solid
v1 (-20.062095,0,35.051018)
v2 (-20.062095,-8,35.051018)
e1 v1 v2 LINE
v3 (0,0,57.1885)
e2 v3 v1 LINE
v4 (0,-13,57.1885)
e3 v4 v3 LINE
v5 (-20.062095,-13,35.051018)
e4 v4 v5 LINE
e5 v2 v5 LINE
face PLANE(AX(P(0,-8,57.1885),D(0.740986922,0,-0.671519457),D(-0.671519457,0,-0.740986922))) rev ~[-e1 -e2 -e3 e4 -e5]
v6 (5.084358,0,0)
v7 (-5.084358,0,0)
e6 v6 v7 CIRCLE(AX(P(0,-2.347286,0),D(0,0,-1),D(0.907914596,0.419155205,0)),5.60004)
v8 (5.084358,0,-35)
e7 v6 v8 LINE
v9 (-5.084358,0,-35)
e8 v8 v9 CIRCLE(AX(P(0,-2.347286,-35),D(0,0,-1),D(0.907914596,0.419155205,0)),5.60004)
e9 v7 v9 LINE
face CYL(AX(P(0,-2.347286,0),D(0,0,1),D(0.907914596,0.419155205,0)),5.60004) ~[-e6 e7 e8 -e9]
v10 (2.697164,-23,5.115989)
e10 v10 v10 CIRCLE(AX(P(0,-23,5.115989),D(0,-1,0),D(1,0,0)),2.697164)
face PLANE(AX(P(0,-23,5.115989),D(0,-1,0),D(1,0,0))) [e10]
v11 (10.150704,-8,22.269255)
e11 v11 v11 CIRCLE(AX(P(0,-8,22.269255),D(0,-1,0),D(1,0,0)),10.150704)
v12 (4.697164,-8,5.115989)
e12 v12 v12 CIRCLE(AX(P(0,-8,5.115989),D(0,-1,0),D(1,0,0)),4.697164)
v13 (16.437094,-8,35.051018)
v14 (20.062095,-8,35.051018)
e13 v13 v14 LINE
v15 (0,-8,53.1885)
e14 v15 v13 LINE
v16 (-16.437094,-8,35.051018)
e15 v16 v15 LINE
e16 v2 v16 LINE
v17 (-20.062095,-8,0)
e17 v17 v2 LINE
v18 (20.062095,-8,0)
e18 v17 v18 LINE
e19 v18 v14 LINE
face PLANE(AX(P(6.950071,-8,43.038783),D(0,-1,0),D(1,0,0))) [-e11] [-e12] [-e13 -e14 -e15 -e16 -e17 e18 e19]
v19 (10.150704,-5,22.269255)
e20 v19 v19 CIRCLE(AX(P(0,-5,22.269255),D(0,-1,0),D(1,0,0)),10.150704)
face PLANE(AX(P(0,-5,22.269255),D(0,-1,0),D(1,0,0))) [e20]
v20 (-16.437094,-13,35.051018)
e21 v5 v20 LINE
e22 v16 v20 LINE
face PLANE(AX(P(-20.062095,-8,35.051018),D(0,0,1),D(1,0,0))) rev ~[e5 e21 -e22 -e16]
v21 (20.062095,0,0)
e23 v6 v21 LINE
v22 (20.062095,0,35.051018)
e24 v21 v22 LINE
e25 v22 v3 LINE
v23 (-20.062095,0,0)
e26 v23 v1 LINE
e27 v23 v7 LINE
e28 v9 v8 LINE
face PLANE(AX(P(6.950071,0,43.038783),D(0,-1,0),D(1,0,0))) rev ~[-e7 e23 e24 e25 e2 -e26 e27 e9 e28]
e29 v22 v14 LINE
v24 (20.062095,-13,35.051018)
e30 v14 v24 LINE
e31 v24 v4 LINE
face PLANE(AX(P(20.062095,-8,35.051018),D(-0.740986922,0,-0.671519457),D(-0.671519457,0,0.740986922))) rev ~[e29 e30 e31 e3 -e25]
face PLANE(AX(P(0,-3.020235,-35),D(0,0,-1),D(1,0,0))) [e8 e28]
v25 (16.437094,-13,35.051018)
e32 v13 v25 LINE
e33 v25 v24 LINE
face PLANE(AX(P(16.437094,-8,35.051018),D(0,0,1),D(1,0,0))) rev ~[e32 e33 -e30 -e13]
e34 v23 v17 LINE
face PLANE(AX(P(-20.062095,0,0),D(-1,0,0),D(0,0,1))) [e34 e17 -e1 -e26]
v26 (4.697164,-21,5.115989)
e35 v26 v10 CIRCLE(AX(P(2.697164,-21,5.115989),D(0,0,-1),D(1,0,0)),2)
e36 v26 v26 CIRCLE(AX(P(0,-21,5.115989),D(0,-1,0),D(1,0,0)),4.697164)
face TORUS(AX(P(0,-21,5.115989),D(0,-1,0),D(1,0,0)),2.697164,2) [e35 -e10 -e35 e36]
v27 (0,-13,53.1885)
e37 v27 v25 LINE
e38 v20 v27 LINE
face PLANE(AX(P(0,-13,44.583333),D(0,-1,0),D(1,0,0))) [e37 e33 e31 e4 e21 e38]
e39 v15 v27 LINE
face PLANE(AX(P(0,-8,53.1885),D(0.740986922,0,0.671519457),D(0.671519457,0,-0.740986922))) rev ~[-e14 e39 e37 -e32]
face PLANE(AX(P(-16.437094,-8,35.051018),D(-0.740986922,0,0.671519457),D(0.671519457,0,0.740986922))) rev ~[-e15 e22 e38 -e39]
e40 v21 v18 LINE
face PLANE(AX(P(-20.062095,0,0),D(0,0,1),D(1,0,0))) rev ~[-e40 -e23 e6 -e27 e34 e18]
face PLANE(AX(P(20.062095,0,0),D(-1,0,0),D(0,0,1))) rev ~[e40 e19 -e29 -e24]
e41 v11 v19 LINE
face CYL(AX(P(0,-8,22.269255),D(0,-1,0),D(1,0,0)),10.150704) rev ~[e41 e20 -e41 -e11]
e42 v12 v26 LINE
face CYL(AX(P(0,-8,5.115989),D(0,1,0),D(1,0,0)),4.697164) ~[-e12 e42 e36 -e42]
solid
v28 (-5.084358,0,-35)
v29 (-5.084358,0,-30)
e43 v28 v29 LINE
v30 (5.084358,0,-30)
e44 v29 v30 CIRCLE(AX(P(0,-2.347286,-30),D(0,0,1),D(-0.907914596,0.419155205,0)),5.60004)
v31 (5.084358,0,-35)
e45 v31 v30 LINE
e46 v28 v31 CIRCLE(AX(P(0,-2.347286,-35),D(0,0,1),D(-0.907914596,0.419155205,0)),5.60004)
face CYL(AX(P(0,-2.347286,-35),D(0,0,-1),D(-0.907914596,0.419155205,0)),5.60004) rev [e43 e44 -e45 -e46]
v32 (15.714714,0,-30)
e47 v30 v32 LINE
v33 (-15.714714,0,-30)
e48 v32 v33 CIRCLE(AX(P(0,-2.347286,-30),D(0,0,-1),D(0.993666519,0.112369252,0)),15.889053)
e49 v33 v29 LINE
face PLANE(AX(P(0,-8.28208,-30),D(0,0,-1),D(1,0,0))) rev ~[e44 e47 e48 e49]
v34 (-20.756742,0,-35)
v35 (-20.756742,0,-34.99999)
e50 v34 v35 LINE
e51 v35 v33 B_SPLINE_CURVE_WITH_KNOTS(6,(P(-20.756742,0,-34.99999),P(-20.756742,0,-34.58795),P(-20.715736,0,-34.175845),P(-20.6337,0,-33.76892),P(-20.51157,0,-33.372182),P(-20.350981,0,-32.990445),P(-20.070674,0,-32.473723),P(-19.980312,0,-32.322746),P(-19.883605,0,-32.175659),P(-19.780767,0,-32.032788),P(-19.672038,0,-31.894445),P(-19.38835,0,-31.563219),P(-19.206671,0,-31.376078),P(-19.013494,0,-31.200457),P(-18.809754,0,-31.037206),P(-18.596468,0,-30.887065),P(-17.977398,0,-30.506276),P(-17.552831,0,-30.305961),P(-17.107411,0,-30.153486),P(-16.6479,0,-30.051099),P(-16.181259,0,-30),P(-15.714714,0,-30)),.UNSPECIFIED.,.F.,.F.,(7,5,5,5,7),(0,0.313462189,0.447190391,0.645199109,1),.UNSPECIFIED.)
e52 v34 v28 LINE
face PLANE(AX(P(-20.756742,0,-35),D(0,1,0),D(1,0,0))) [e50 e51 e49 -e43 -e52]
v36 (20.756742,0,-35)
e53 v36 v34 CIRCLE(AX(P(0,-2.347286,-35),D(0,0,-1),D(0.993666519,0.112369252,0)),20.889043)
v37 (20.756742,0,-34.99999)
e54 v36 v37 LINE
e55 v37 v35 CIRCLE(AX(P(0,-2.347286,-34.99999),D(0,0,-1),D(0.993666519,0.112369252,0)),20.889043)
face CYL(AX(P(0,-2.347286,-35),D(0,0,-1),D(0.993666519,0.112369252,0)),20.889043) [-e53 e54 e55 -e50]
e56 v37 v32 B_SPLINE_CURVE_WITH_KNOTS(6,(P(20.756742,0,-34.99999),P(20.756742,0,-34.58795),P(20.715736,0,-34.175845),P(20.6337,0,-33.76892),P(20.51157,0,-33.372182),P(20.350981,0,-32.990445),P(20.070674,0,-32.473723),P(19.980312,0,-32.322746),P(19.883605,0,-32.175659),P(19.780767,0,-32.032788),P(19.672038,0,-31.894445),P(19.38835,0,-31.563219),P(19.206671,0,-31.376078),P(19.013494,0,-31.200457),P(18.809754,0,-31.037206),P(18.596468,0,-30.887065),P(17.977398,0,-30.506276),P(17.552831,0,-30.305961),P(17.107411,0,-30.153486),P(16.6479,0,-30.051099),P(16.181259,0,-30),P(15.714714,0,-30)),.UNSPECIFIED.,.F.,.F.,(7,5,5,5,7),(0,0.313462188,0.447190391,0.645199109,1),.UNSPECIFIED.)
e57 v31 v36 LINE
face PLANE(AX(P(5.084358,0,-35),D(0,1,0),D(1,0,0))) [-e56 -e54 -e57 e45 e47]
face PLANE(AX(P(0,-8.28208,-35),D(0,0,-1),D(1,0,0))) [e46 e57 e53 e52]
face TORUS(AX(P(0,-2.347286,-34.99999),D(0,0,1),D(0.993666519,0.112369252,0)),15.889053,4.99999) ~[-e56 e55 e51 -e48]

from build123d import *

# Parameters (mm, degrees)
F0_W      = 20.0620945543
F0_H      = 35.0510179996
F1_DEPTH  = 8
F2_R      = 10.1507039691
F3_DEPTH  = 3
F4_R      = 4.6971638308
F5_DEPTH  = 15
F6_R      = 2
F8_DEPTH  = 35
F10_DEPTH = 5
F11_R     = 4.99999
F13_DEPTH = 5


# Not quite as in the source:
# - a fillet or chamfer is up to 0.001 mm smaller than in the source, because OpenCascade refuses the exact size


with BuildPart() as f1:
    # F0 (on Front) → F1 (new body)
    with BuildSketch(Plane.XZ):
        Polygon((0, 57.1884997189), (0, 35.0510179996), (20.0620945543, 35.0510179996), align=None)
        Polygon((-20.0620945543, 35.0510179996), (0, 35.0510179996), (0, 57.1884997189), align=None)
        with Locations((-10.0310472772, 17.5255089998)):
            Rectangle(F0_W, F0_H)
        with Locations((10.0310472772, 17.5255089998)):
            Rectangle(F0_W, F0_H)
    extrude(amount=F1_DEPTH)

    # F2 (on face) → F3 (cut)
    with BuildSketch(Plane.XZ.offset(8)):
        with Locations((0, 22.2692545503)):
            Circle(F2_R)
    extrude(amount=-F3_DEPTH, mode=Mode.SUBTRACT)

    # F4 (on face) → F5 (join)
    with BuildSketch(Plane.XZ.offset(8)):
        with Locations((0, 5.1159886643)):
            Circle(F4_R)
    extrude(amount=F5_DEPTH)

    # F6
    f6_edges = [f1.edges().sort_by_distance(p)[0] for p in [
        (-4.697164, -23, 5.115989),
    ]]
    fillet(f6_edges, radius=F6_R)

    # F7 (on face) → F8 (join)
    with BuildSketch(Plane(origin=(0, 0, 0), x_dir=(1, 0, 0), z_dir=(0, 0, -1))):
        with BuildLine():
            Line((-5.0843584387, 0), (5.0843584387, 0))
            ThreePointArc((5.0843584387, 0), (0, 7.9473265145), (-5.0843584387, 0))
        make_face()
    extrude(amount=F8_DEPTH)

    # F12 (on face) → F13 (join)
    with BuildSketch(Plane.XZ.offset(8)):
        Polygon((0, 57.1884997189), (-20.0620945543, 35.0510179996), (-16.4370942388, 35.0510179996), (0, 53.1884997189), (16.4370942388, 35.0510179996), (20.0620945543, 35.0510179996), align=None)
    extrude(amount=F13_DEPTH)


with BuildPart() as f10:
    # F9 (on face) → F10 (new body)
    with BuildSketch(Plane(origin=(0, 0, -35), x_dir=(1, 0, 0), z_dir=(0, 0, -1))):
        with BuildLine():
            Line((5.0843584387, 0), (20.7567422331, 0))
            ThreePointArc((20.7567422331, 0), (0, 23.2363286774), (-20.7567422331, 0))
            Line((-20.7567422331, 0), (-5.0843584387, 0))
            ThreePointArc((-5.0843584387, 0), (0, 7.9473265145), (5.0843584387, 0))
        make_face()
    extrude(amount=-F10_DEPTH)

    # F11 (radius 5 in the source; OpenCascade refuses exactly that, so slightly less here)
    f11_edges = [f10.edges().sort_by_distance(p)[0] for p in [
        (0, -23.236329, -30),
    ]]
    fillet(f11_edges, radius=F11_R)


solid = Compound([f1.part, f10.part])
